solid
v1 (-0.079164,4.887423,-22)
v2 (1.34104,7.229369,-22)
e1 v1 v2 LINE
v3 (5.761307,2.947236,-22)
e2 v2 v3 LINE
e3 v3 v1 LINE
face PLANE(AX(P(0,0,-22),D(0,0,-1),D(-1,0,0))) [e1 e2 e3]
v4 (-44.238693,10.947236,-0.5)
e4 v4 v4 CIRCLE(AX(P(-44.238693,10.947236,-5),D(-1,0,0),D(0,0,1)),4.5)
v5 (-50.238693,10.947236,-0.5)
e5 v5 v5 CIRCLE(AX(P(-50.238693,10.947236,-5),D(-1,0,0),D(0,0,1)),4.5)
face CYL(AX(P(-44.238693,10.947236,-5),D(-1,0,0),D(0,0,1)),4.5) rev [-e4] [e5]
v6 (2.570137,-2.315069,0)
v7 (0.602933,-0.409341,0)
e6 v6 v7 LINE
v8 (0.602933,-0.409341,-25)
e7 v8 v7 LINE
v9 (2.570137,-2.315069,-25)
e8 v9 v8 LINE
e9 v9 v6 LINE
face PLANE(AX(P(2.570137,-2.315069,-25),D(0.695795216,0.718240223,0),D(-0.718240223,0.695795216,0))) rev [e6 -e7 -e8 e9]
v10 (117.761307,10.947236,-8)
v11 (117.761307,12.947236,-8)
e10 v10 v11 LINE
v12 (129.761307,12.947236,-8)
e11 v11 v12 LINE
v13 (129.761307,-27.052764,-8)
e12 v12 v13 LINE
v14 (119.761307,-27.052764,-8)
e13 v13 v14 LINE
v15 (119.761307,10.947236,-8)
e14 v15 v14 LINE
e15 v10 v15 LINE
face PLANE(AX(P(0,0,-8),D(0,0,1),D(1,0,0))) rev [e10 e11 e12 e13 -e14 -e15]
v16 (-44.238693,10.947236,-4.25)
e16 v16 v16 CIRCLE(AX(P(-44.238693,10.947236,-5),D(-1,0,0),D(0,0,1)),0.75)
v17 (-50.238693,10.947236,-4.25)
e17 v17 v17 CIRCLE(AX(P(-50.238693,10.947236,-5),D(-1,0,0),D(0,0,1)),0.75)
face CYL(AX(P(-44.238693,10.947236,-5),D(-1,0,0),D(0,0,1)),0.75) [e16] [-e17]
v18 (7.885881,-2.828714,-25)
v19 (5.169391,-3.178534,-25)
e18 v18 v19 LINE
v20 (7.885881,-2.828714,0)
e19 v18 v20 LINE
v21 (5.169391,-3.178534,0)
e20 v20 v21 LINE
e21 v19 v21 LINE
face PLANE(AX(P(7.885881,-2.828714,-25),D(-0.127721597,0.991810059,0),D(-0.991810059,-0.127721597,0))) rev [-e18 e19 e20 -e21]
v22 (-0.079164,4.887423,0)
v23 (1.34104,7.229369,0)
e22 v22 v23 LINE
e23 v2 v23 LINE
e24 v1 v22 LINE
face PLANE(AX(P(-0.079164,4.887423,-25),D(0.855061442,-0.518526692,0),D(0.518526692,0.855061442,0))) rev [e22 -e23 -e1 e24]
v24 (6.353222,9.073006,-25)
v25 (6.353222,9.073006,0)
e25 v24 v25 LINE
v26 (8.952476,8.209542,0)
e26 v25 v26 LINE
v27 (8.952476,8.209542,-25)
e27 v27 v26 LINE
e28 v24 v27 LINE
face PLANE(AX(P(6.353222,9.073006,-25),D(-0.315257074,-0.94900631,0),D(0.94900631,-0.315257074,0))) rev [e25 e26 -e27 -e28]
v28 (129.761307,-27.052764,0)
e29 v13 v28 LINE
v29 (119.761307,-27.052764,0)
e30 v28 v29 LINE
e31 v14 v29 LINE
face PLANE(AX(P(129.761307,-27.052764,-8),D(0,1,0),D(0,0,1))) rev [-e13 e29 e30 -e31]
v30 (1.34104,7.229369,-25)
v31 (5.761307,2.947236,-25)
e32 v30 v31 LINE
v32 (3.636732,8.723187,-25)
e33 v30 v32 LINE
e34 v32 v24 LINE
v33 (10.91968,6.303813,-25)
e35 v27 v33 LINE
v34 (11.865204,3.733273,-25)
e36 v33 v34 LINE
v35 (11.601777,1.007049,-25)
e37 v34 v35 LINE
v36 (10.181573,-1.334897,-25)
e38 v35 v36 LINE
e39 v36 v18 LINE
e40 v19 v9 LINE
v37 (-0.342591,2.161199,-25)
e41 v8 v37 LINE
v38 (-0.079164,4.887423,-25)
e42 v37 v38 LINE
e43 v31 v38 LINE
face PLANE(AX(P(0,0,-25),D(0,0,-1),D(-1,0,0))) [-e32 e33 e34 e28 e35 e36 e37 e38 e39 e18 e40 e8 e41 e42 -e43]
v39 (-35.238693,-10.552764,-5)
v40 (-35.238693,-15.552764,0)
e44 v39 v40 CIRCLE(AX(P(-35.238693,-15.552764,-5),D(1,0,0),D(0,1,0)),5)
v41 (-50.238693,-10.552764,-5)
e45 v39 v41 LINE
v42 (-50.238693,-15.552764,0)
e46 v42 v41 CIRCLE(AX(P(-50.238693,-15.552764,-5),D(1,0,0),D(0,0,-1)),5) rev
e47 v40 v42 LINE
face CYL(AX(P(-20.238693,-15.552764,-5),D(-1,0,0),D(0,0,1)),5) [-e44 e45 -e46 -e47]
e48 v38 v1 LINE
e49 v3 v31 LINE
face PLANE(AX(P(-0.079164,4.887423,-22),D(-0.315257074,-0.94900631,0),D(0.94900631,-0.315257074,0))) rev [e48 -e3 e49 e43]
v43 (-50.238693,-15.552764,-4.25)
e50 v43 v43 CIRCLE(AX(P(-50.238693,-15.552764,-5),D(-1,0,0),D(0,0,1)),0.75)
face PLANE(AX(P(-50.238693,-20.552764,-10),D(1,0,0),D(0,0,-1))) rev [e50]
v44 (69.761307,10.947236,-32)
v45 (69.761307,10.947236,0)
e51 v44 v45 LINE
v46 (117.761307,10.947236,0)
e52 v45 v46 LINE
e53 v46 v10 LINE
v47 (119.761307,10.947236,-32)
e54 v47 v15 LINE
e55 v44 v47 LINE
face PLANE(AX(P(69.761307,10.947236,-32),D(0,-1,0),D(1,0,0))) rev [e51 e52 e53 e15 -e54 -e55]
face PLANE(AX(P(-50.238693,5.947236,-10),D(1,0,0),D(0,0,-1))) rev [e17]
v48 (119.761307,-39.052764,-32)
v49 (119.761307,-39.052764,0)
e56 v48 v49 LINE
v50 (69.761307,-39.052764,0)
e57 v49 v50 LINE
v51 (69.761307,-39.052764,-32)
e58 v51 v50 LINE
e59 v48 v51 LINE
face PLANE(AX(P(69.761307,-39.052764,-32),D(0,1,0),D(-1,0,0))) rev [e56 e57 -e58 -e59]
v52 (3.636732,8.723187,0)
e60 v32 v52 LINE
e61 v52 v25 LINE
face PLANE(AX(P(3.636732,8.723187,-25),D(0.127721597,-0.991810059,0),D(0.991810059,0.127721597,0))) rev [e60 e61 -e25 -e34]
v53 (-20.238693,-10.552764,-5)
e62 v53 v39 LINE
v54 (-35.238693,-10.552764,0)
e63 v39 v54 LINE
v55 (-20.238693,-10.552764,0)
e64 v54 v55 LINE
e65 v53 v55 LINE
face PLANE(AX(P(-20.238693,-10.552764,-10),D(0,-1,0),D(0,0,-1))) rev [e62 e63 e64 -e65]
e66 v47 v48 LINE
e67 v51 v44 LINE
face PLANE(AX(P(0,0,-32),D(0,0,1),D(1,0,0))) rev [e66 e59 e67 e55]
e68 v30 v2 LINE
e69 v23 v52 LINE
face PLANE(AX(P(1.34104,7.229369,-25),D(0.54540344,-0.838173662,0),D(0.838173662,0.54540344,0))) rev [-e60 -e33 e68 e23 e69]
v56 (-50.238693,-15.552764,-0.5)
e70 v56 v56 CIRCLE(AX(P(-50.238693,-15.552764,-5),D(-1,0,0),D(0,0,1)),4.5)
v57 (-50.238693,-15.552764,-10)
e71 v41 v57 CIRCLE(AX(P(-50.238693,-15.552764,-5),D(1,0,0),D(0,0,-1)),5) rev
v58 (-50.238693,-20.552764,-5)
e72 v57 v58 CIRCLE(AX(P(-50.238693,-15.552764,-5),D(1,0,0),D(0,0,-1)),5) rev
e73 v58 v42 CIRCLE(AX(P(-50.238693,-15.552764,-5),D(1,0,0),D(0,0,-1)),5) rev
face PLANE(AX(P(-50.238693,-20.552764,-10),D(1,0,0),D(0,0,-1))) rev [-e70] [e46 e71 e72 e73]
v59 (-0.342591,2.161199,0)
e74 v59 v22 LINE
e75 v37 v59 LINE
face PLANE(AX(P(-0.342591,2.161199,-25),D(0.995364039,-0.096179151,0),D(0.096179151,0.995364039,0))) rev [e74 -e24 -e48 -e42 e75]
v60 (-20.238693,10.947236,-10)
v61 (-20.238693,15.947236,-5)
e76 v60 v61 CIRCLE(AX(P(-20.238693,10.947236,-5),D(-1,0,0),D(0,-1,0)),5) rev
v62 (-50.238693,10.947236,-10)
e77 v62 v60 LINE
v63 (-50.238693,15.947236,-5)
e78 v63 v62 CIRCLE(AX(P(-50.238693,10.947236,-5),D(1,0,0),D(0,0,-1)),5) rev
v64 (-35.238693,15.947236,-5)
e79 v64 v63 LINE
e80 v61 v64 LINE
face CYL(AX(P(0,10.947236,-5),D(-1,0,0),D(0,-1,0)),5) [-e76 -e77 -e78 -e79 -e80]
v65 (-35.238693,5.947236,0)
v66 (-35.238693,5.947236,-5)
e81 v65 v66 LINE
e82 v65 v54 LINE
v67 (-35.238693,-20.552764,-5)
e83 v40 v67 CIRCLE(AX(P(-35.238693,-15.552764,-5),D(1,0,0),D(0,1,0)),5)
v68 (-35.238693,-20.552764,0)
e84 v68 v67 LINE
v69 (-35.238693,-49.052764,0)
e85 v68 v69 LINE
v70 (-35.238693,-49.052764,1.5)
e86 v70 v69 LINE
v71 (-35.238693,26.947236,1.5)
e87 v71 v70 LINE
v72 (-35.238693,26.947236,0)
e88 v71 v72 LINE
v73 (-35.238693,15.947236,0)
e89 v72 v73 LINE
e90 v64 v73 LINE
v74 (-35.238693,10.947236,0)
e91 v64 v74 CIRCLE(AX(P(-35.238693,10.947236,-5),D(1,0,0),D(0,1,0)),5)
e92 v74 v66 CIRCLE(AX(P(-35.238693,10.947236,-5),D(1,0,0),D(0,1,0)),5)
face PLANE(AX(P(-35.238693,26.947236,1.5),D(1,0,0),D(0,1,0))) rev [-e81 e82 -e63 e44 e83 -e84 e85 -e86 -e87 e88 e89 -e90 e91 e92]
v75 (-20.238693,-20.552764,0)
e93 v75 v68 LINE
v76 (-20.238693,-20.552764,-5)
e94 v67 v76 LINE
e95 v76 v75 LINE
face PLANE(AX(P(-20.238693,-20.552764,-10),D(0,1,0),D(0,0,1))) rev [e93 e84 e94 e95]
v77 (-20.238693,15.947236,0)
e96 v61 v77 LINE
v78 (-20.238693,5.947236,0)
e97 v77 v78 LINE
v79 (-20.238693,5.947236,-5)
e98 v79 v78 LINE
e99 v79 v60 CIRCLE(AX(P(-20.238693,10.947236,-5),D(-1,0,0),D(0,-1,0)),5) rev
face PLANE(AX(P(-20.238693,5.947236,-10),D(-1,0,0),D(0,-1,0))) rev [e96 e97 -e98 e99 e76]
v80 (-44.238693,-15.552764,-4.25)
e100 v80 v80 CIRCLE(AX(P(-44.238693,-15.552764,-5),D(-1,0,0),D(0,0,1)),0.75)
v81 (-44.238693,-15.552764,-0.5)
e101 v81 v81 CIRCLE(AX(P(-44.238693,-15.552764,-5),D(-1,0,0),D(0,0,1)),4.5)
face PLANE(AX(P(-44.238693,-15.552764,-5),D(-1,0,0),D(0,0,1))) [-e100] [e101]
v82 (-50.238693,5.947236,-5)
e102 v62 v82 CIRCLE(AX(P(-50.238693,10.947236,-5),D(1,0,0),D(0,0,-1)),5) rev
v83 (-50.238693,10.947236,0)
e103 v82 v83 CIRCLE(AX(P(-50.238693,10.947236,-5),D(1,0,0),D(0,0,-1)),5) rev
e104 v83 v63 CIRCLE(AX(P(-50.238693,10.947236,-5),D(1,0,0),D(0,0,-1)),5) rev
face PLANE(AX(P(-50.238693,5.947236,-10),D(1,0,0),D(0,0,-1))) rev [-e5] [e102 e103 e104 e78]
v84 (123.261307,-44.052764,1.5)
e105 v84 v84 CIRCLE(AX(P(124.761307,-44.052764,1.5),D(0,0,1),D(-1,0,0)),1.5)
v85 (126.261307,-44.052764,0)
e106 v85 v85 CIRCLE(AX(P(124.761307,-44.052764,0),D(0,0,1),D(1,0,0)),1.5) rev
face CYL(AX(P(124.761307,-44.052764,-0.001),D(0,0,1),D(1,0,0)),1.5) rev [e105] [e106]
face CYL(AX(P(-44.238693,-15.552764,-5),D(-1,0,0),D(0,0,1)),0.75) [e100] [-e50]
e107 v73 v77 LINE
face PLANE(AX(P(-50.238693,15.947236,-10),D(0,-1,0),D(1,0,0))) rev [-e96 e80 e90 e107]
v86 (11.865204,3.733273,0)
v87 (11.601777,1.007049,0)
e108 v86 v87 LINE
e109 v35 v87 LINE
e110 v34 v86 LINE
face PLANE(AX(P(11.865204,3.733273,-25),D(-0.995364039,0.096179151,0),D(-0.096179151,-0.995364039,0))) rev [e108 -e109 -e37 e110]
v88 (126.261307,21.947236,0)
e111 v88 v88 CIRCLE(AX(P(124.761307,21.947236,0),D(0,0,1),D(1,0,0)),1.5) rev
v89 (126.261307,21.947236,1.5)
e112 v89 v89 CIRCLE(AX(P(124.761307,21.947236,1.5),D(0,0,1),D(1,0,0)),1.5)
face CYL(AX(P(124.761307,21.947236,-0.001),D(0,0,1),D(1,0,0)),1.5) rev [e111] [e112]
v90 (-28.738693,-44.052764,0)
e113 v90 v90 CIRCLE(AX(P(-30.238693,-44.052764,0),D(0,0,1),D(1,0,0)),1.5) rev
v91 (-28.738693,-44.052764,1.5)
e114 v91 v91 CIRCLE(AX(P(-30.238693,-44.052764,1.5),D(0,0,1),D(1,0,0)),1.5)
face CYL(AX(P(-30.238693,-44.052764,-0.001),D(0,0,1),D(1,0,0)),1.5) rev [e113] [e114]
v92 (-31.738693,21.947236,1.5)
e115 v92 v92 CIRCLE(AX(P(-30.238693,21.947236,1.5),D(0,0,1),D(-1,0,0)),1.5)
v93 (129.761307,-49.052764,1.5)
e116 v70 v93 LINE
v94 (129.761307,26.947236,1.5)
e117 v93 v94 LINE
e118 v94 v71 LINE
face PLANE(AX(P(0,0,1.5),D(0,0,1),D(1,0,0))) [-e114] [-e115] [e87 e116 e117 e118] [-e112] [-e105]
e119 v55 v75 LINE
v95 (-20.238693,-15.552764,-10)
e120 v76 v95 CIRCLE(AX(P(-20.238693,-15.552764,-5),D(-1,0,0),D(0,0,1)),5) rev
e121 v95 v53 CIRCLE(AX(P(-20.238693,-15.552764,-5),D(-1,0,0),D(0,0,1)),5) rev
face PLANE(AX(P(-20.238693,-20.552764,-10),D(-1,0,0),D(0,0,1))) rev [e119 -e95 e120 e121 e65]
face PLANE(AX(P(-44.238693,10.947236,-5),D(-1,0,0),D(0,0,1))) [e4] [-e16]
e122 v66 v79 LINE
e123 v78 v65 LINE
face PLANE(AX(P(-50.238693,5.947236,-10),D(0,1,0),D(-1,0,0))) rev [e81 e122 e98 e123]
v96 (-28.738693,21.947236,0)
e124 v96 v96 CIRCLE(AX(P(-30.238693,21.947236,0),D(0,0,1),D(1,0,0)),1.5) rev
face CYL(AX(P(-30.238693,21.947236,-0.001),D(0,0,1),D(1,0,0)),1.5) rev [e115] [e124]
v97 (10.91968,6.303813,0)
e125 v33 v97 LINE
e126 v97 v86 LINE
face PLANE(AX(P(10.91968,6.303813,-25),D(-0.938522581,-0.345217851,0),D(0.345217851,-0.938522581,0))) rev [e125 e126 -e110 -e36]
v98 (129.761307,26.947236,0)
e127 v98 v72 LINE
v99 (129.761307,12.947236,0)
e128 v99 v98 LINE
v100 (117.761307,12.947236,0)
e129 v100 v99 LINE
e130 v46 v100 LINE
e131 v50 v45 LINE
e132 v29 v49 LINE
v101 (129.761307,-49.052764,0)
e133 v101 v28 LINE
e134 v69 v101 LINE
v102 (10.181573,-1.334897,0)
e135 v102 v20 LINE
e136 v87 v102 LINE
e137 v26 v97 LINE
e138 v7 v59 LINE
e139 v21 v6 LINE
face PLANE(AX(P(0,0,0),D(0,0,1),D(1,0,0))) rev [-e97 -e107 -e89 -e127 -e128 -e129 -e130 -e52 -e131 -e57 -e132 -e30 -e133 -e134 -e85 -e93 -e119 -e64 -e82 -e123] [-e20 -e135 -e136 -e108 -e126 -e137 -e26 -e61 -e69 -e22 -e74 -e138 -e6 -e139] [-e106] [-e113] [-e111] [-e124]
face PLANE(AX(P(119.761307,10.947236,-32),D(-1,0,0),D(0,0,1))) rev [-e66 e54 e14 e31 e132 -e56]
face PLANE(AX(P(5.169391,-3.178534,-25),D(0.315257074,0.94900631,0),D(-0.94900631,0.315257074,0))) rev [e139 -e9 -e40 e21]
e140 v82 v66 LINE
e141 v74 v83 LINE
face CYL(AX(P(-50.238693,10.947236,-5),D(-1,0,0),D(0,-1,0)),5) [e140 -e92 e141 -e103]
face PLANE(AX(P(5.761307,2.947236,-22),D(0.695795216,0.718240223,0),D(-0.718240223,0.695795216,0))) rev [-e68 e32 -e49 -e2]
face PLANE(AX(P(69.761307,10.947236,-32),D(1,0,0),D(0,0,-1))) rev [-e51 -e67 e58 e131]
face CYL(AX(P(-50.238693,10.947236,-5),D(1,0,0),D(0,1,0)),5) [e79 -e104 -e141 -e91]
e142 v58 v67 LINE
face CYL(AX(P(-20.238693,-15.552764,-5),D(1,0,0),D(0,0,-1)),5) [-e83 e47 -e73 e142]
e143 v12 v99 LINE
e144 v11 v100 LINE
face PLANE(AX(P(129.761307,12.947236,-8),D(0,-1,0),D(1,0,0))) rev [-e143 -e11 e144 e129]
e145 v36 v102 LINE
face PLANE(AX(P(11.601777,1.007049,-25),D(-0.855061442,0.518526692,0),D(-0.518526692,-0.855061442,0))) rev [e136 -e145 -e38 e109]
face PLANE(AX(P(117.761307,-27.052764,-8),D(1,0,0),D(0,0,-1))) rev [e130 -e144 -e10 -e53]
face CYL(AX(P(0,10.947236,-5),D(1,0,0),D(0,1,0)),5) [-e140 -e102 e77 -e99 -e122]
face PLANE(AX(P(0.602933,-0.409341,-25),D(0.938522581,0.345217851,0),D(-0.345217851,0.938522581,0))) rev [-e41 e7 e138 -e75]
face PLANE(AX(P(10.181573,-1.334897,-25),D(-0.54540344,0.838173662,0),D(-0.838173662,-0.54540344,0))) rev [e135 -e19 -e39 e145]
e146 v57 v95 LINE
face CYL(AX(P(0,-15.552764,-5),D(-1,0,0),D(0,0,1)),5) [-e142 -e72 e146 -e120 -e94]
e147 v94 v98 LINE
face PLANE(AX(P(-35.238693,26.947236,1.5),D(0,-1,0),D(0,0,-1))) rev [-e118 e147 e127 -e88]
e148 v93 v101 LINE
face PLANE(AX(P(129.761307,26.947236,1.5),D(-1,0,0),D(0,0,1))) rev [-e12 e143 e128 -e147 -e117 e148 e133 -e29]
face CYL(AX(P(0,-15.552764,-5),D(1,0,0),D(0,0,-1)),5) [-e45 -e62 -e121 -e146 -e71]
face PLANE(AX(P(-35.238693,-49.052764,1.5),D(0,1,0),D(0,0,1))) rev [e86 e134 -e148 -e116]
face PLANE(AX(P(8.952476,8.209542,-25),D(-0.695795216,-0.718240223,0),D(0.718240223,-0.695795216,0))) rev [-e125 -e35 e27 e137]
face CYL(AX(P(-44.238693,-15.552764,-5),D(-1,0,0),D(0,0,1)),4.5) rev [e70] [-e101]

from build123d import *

# Parameters (mm, degrees)
SKETCH1_W           = 165
SKETCH1_H           = 76
BOSS_EXTRUDE1_DEPTH = 1.5
CUT_EXTRUDE1_REACH  = 140.731
SKETCH2_R           = 1.5
SKETCH3_W           = 12
SKETCH3_H           = 40
BOSS_EXTRUDE2_DEPTH = 8
SKETCH4_W           = 50
SKETCH4_H           = 50
BOSS_EXTRUDE3_DEPTH = 32
SKETCH5_W           = 30
SKETCH5_H           = 10
BOSS_EXTRUDE4_DEPTH = 10
BOSS_EXTRUDE5_DEPTH = 25
FILLET2_R           = 5
SKETCH8_R           = 4.5
SKETCH8_R_2         = 0.75
CUT_EXTRUDE2_DEPTH  = 6
CUT_EXTRUDE3_DEPTH  = 3


with BuildPart() as part:
    # Sketch1 → Boss-Extrude1 (new body)
    with BuildSketch(Plane.XY):
        with Locations((47.261306533, -11.052763819)):
            Rectangle(SKETCH1_W, SKETCH1_H)
    extrude(amount=BOSS_EXTRUDE1_DEPTH)

    # Sketch2 → Cut-Extrude1 (cut, up to next)
    with BuildSketch(Plane.XY.offset(1.5), mode=Mode.PRIVATE) as cut_extrude1_sk1:
        with Locations((124.761306533, 21.947236181)):
            Circle(SKETCH2_R)
    cut_extrude1_tool1 = extrude(cut_extrude1_sk1.sketch, amount=-CUT_EXTRUDE1_REACH, mode=Mode.PRIVATE) & part.part
    # Sketch2 → Cut-Extrude1 (cut, up to next)
    with BuildSketch(Plane.XY.offset(1.5), mode=Mode.PRIVATE) as cut_extrude1_sk2:
        with Locations((124.761306533, -44.052763819)):
            Circle(SKETCH2_R)
    cut_extrude1_tool2 = extrude(cut_extrude1_sk2.sketch, amount=-CUT_EXTRUDE1_REACH, mode=Mode.PRIVATE) & part.part
    # Sketch2 → Cut-Extrude1 (cut, up to next)
    with BuildSketch(Plane.XY.offset(1.5), mode=Mode.PRIVATE) as cut_extrude1_sk3:
        with Locations((-30.238693467, -44.052763819)):
            Circle(SKETCH2_R)
    cut_extrude1_tool3 = extrude(cut_extrude1_sk3.sketch, amount=-CUT_EXTRUDE1_REACH, mode=Mode.PRIVATE) & part.part
    # Sketch2 → Cut-Extrude1 (cut, up to next)
    with BuildSketch(Plane.XY.offset(1.5), mode=Mode.PRIVATE) as cut_extrude1_sk4:
        with Locations((-30.238693467, 21.947236181)):
            Circle(SKETCH2_R)
    cut_extrude1_tool4 = extrude(cut_extrude1_sk4.sketch, amount=-CUT_EXTRUDE1_REACH, mode=Mode.PRIVATE) & part.part
    add(cut_extrude1_tool1.solids().sort_by_distance((124.761307, 21.947236, 1.5))[0], mode=Mode.SUBTRACT)
    add(cut_extrude1_tool2.solids().sort_by_distance((124.761307, -44.052764, 1.5))[0], mode=Mode.SUBTRACT)
    add(cut_extrude1_tool3.solids().sort_by_distance((-30.238693, -44.052764, 1.5))[0], mode=Mode.SUBTRACT)
    add(cut_extrude1_tool4.solids().sort_by_distance((-30.238693, 21.947236, 1.5))[0], mode=Mode.SUBTRACT)

    # Sketch3 → Boss-Extrude2 (add)
    with BuildSketch(Plane(origin=(0, 0, 0), x_dir=(-1, 0, 0), z_dir=(0, 0, -1))):
        with Locations((-123.761306533, -7.052763819)):
            Rectangle(SKETCH3_W, SKETCH3_H)
    extrude(amount=BOSS_EXTRUDE2_DEPTH)

    # Sketch4 → Boss-Extrude3 (add)
    with BuildSketch(Plane(origin=(0, 0, 0), x_dir=(-1, 0, 0), z_dir=(0, 0, -1))):
        with Locations((-94.761306533, -14.052763819)):
            Rectangle(SKETCH4_W, SKETCH4_H)
    extrude(amount=BOSS_EXTRUDE3_DEPTH)

    # Sketch5 → Boss-Extrude4 (add)
    with BuildSketch(Plane(origin=(0, 0, 0), x_dir=(-1, 0, 0), z_dir=(0, 0, -1))):
        with Locations((35.238693467, 10.947236181)):
            Rectangle(SKETCH5_W, SKETCH5_H)
        with Locations((35.238693467, -15.552763819)):
            Rectangle(SKETCH5_W, SKETCH5_H)
    extrude(amount=BOSS_EXTRUDE4_DEPTH)

    # Sketch6 → Boss-Extrude5 (add)
    with BuildSketch(Plane(origin=(0, 0, 0), x_dir=(-1, 0, 0), z_dir=(0, 0, -1))):
        Polygon((0.079164122, 4.887423166), (-1.341039882, 7.229369498), (-3.636731908, 8.72318681), (-6.353221994, 9.073006263), (-8.952475964, 8.209541823), (-10.919679691, 6.303813212), (-11.86520435, 3.733273355), (-11.601777188, 1.007049196), (-10.181573183, -1.334897137), (-7.885881157, -2.828714449), (-5.169391071, -3.178533901), (-2.570137101, -2.315069461), (-0.602933374, -0.409340851), (0.342591285, 2.161199006), align=None)
    extrude(amount=BOSS_EXTRUDE5_DEPTH)

    # Fillet2
    fillet2_edges = [part.edges().sort_by_distance(p)[0] for p in [
        (-42.738693467, 5.947236181, 0),
        (-42.738693467, 15.947236181, 0),
        (-35.238693467, 15.947236181, -10),
        (-35.238693467, 5.947236181, -10),
        (-42.738693467, -20.552763819, 0),
        (-42.738693467, -10.552763819, 0),
        (-35.238693467, -10.552763819, -10),
        (-35.238693467, -20.552763819, -10),
    ]]
    fillet(fillet2_edges, radius=FILLET2_R - 0.0001)  # a hair under: the kernel refuses the full size

    # Sketch8 → Cut-Extrude2 (cut)
    # profile 1 of 2: a face of its own
    with BuildSketch(Plane.ZY.offset(50.238693467)):
        with Locations((-5, -15.552763819)):
            Circle(SKETCH8_R)
        with Locations((-5, -15.552763819)):
            Circle(SKETCH8_R_2, mode=Mode.SUBTRACT)
    # profile 2 of 2: a face of its own
    with BuildSketch(Plane.ZY.offset(50.238693467)):
        with Locations((-5, 10.947236181)):
            Circle(SKETCH8_R)
        with Locations((-5, 10.947236181)):
            Circle(SKETCH8_R_2, mode=Mode.SUBTRACT)
    extrude(amount=-CUT_EXTRUDE2_DEPTH, mode=Mode.SUBTRACT)

    # Sketch10 → Cut-Extrude3 (cut)
    with BuildSketch(Plane(origin=(0, 0, -25), x_dir=(-1, 0, 0), z_dir=(0, 0, -1))):
        Polygon((-5.761306533, 2.947236181), (-1.341039882, 7.229369498), (0.079164122, 4.887423166), align=None)
    extrude(amount=-CUT_EXTRUDE3_DEPTH, mode=Mode.SUBTRACT)


solid = part.part
